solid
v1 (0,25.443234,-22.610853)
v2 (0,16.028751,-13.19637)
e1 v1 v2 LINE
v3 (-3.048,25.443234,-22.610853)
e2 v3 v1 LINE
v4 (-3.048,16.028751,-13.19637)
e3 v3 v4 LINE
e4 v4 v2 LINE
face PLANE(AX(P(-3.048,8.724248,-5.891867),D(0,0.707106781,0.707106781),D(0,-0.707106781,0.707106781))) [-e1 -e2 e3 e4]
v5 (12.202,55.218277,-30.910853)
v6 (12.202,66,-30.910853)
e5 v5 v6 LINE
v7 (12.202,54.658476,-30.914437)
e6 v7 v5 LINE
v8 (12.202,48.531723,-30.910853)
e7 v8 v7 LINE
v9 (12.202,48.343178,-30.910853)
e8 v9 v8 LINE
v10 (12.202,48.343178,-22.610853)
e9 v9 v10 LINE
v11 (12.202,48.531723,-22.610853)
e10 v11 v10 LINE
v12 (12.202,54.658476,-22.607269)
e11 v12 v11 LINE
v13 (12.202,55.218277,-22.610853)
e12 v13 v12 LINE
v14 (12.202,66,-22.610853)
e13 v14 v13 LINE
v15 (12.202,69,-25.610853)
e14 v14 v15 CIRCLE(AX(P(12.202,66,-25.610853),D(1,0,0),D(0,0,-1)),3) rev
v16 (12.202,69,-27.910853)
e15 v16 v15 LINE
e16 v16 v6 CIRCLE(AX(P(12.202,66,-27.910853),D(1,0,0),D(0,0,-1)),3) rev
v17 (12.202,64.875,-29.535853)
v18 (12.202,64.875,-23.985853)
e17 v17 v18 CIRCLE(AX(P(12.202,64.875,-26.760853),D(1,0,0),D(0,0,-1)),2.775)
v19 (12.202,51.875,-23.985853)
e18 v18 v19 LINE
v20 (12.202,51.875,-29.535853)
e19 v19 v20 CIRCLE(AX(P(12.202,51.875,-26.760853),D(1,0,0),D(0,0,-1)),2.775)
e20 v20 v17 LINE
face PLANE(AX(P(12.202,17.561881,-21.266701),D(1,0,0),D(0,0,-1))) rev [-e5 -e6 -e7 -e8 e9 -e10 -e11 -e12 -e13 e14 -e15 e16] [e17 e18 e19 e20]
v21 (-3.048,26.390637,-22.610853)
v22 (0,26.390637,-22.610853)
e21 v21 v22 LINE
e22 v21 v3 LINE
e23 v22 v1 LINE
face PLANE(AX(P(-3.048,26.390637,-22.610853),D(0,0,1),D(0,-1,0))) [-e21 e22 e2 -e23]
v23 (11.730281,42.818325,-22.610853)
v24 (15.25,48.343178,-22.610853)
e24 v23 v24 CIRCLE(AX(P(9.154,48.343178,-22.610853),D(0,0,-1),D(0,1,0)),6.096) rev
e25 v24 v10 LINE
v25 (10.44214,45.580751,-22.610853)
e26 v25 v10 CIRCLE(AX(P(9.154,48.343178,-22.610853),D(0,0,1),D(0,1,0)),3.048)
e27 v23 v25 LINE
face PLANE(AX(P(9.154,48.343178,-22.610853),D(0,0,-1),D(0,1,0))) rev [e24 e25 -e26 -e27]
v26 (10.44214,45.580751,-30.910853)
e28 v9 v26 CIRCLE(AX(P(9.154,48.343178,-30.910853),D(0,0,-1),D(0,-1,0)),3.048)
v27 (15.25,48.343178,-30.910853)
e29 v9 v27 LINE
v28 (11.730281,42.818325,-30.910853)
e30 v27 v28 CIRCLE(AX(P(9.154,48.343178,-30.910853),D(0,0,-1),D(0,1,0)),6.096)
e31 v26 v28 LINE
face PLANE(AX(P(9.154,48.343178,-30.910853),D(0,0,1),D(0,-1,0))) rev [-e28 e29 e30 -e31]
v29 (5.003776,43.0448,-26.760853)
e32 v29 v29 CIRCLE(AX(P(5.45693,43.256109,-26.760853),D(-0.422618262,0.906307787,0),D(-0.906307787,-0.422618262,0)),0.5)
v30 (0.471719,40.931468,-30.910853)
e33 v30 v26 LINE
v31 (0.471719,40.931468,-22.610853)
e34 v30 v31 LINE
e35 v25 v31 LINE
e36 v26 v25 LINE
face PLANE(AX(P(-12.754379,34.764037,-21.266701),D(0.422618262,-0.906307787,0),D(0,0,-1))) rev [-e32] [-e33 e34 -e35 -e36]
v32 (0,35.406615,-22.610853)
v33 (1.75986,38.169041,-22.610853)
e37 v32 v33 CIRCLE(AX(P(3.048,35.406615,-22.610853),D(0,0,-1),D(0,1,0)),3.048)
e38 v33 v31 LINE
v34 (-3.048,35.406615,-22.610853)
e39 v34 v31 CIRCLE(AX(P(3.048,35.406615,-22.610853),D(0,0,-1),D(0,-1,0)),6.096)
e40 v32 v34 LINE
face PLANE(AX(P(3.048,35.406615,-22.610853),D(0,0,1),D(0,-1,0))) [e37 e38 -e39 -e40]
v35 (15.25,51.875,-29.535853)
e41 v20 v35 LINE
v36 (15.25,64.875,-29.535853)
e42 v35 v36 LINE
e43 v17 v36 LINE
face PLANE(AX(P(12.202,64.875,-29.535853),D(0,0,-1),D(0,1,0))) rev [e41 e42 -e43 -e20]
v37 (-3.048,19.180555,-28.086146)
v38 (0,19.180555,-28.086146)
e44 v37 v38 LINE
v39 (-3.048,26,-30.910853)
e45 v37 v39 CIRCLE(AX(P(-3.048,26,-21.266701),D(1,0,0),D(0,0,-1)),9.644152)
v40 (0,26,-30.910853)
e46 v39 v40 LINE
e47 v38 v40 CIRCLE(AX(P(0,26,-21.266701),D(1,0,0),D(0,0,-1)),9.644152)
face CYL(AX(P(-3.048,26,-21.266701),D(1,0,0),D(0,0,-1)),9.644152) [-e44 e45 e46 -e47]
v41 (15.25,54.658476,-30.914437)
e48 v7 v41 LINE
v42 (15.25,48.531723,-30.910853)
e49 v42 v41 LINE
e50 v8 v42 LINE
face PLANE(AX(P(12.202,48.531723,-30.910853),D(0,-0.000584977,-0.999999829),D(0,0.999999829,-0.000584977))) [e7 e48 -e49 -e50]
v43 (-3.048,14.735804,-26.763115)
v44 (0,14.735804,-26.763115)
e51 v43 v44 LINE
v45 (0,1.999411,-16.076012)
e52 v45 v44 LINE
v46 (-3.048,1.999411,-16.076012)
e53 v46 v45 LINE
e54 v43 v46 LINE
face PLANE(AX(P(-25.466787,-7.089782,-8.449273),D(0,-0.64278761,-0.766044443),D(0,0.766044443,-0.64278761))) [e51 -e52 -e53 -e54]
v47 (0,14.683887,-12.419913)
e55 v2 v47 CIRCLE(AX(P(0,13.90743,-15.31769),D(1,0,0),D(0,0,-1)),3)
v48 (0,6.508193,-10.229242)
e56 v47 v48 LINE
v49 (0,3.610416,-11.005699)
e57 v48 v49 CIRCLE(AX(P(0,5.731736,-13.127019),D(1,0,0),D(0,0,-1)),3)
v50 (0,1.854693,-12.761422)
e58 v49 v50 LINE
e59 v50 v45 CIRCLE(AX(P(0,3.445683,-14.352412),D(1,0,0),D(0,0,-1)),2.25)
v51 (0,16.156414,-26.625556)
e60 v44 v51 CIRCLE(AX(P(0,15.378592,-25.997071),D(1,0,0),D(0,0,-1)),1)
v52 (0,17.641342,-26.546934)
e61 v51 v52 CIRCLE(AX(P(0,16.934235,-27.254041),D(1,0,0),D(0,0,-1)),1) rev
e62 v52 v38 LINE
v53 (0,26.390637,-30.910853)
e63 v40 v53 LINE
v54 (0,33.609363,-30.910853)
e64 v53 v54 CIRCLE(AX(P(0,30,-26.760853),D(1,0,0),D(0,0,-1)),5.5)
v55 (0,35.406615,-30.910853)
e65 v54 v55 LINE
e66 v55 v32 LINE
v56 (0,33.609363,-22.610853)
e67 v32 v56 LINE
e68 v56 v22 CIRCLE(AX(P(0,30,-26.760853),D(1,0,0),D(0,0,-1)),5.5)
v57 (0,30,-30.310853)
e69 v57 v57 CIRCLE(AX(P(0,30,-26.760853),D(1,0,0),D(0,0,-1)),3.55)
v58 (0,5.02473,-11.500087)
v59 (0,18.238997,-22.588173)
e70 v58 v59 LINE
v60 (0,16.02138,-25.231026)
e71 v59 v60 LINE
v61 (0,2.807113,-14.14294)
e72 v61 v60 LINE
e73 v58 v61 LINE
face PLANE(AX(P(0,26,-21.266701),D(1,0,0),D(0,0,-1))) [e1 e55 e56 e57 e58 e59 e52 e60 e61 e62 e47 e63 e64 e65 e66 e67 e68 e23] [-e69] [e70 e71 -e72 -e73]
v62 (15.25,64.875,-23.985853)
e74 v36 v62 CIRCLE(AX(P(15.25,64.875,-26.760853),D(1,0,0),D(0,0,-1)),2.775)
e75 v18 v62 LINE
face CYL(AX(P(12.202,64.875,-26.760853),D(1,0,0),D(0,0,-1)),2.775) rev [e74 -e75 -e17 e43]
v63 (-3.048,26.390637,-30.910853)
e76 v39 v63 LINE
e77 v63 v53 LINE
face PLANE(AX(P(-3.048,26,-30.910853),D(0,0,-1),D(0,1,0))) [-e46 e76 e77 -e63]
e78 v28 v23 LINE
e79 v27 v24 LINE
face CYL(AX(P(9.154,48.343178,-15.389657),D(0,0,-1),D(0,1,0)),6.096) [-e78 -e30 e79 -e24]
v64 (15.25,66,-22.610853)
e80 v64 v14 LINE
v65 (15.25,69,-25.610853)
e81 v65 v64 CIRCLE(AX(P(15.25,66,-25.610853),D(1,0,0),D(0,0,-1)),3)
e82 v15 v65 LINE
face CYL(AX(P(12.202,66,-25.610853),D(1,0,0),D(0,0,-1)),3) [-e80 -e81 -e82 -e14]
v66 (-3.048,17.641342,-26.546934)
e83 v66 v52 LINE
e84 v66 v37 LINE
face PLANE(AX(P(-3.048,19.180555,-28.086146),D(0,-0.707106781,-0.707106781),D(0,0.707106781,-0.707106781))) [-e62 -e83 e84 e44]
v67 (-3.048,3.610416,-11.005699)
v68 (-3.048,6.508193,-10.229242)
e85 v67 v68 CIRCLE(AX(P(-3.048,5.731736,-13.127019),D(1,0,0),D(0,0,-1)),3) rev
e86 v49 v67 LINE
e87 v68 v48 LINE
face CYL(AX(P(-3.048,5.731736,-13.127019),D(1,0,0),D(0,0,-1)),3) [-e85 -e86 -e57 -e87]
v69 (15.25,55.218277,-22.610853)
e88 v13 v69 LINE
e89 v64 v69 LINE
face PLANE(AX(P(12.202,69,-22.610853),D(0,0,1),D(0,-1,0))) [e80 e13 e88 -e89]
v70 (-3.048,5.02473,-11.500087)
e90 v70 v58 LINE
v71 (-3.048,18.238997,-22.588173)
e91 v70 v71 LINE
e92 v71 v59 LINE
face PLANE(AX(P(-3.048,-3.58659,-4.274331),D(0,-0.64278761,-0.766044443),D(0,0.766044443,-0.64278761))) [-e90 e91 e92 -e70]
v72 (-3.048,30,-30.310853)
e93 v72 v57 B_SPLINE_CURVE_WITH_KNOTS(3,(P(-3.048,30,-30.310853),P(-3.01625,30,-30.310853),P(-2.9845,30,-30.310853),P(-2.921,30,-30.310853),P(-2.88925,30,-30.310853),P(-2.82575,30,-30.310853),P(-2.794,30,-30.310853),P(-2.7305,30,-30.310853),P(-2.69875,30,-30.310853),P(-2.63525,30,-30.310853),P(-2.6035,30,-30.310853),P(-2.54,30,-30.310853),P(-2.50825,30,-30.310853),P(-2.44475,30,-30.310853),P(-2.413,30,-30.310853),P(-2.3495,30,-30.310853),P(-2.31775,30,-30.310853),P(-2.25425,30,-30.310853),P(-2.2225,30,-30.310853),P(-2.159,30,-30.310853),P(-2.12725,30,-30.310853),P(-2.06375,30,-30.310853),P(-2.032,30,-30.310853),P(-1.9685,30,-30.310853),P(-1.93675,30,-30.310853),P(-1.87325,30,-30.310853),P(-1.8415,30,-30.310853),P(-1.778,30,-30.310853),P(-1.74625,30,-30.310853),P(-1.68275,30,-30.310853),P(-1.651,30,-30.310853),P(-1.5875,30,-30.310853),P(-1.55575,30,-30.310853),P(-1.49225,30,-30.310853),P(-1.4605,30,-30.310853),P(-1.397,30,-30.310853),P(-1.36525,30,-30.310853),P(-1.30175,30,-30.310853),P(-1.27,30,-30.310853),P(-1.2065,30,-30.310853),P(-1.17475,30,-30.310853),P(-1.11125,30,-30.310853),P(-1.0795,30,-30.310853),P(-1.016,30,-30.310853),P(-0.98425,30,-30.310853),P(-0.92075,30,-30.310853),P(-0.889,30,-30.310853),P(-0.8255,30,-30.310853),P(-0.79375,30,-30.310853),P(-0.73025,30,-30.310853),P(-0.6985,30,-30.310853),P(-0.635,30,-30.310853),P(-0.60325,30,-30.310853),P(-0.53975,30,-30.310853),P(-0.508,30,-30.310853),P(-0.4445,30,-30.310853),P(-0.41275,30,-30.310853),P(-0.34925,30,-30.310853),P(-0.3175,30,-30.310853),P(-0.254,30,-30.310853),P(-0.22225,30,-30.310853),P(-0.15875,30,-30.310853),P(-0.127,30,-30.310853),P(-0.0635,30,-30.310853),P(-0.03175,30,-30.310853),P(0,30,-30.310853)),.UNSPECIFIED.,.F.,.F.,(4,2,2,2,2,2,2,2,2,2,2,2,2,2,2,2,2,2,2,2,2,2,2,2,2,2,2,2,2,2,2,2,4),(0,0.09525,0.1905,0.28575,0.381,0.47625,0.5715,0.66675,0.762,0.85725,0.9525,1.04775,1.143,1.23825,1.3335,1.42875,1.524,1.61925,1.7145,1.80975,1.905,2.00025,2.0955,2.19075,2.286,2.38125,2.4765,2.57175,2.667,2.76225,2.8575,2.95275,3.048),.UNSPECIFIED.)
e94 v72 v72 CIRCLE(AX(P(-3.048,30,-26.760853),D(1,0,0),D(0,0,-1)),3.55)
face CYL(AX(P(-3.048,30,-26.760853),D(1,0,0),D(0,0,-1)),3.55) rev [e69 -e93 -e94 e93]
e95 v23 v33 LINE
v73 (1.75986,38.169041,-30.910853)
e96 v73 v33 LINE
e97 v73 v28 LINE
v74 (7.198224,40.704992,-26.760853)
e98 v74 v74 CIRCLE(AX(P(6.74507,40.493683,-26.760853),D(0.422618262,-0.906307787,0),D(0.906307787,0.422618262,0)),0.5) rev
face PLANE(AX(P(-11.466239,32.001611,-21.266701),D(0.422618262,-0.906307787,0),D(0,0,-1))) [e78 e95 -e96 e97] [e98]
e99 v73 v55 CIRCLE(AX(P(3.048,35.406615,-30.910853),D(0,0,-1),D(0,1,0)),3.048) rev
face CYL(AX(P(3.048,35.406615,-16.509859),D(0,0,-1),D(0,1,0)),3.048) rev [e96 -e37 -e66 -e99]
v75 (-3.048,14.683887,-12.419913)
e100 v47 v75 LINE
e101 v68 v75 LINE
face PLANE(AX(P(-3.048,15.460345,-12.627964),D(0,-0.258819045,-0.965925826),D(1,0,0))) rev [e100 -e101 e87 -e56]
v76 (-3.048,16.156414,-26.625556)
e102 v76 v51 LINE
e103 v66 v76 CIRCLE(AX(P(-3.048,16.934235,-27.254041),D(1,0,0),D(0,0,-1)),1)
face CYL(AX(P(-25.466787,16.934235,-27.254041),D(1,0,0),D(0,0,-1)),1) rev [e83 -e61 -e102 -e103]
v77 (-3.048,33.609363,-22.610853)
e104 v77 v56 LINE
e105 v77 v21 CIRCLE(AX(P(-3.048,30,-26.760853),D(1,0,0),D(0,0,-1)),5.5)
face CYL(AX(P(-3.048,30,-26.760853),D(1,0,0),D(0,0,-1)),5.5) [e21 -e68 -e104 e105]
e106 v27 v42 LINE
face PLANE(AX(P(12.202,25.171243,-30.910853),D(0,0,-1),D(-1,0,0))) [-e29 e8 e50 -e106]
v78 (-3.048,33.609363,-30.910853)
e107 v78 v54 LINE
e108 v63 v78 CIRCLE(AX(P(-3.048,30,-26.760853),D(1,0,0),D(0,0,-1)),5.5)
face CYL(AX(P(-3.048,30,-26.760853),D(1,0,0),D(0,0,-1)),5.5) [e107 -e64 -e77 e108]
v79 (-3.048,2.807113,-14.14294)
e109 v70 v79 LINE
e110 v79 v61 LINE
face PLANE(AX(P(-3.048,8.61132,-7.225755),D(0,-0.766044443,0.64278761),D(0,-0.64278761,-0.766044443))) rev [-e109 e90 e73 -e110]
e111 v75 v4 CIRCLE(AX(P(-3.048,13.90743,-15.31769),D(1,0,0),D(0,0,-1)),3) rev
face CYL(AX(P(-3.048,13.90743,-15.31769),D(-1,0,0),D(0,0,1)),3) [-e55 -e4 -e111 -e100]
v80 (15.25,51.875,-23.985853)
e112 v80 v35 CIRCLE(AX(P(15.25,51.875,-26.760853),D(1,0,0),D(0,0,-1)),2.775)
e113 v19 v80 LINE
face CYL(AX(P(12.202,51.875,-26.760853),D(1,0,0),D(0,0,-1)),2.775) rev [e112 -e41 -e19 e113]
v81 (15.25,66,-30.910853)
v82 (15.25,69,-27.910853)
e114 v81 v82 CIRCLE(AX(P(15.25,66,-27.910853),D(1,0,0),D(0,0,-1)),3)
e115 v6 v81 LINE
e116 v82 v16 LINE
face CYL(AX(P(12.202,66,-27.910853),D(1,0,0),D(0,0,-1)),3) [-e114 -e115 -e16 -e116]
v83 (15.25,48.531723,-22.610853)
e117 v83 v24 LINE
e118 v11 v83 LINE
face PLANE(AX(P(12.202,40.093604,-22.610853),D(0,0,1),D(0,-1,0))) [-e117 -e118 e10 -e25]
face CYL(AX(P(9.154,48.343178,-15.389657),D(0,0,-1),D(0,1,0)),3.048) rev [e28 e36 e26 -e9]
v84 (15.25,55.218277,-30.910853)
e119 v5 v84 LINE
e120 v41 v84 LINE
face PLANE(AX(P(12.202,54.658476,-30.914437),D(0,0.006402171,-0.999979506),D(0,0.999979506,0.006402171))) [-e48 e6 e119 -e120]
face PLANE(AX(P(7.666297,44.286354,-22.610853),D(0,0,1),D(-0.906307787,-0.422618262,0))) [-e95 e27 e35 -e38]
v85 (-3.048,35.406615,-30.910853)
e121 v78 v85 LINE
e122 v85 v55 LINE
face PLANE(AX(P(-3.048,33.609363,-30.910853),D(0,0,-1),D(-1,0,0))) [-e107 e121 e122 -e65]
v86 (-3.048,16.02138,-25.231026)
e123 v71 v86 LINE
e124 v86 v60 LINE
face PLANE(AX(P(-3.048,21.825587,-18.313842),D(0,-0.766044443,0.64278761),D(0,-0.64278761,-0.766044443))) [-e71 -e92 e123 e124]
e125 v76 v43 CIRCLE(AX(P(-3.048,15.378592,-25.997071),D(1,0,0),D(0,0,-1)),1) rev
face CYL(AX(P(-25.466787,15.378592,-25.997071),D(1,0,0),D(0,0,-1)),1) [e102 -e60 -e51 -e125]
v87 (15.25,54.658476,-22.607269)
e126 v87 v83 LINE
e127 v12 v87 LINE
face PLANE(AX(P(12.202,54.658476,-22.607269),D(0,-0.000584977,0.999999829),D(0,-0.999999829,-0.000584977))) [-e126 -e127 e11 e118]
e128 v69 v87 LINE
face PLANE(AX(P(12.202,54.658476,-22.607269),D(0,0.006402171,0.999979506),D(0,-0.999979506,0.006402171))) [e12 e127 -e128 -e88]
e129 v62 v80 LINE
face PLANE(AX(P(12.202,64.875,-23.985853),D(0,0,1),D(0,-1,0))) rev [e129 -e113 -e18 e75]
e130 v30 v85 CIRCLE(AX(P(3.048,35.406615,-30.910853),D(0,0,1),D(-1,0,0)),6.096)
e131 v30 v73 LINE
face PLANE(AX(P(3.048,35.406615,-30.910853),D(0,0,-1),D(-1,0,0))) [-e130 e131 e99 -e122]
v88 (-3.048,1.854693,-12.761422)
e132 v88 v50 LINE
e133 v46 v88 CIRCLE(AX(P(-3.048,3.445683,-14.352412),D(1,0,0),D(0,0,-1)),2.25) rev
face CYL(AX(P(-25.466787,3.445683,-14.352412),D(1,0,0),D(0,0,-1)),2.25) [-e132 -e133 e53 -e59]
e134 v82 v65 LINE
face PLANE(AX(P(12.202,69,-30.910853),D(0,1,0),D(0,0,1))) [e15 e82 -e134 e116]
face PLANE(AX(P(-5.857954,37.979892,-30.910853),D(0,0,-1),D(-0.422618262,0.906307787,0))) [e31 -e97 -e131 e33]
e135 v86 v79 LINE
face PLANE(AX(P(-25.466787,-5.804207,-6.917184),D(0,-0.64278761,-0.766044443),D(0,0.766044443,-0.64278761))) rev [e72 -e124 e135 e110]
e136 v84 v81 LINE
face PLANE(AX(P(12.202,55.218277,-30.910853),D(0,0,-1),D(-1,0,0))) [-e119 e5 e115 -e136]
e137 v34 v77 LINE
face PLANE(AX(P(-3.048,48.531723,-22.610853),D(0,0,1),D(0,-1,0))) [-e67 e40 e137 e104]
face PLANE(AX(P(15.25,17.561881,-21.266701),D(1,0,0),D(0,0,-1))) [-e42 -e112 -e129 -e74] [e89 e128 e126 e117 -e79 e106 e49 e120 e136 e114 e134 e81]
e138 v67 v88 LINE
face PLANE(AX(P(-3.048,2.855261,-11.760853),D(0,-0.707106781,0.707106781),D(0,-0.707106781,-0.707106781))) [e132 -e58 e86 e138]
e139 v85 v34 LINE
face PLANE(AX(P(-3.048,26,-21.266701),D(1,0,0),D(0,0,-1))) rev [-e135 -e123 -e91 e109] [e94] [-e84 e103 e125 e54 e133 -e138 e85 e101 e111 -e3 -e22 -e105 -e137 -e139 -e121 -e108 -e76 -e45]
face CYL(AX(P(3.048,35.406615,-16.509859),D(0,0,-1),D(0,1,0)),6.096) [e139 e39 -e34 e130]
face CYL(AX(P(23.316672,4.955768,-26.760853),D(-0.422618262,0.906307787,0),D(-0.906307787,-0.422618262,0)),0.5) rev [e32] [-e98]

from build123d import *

# Parameters (mm, degrees)
BASE_FLANGE1_START     = -3.048
BASE_FLANGE1_OUTLINE_R = 3.55
BASE_FLANGE1_DEPTH     = 3.048
CHAMFER1_SIZE          = 5.5
CHAMFER1_SIZE2         = 9.526279442
FILLET5_R              = 3
JOG1_START             = -32.26085306
JOG1_DEPTH             = 22.133833772
JOG1_START_2           = -30.91085306
JOG1_2_DEPTH           = 1.375
JOG1_START_3           = -23.98585306
JOG1_3_DEPTH           = 1.375
JOG1_START_4           = -30.914437073
JOG1_4_DEPTH           = 8.307168025
JOG1_5_DEPTH           = 15.25
FILLET4_R              = 3
CUT_EXTRUDE3_DEPTH     = 78.680918765
BOSS_EXTRUDE1_DEPTH    = 3.048
CUT_EXTRUDE4_REACH     = 59.066
SKETCH15_R             = 0.5


with BuildPart() as part:
    # Base-Flange1: read off the stored shape, not the designer's step
    # Base-Flange1 outline → Base-Flange1 (new body)
    with BuildSketch(Plane(origin=(0, 0, 0), x_dir=(0, 0, -1), z_dir=(1, 0, 0)).offset(BASE_FLANGE1_START)):
        with BuildLine():
            Line((11.76085306, 2.855261469), (28.086146356, 19.180554765))
            ThreePointArc((28.086146356, 19.180554765), (30.176735706, 22.309342834), (30.91085306, 26))
            Line((30.91085306, 26), (30.91085306, 26.390637175))
            ThreePointArc((30.91085306, 26.390637175), (32.26085306, 30), (30.91085306, 33.609362825))
            Line((30.91085306, 33.609362825), (30.91085306, 48.531723164))
            Line((30.91085306, 48.531723164), (30.914437073, 54.658476217))
            Line((30.914437073, 54.658476217), (30.91085306, 55.218276836))
            Line((30.91085306, 55.218276836), (30.91085306, 69))
            Line((30.91085306, 69), (22.61085306, 69))
            Line((22.61085306, 69), (22.61085306, 55.218276836))
            Line((22.61085306, 55.218276836), (22.607269048, 54.658476217))
            Line((22.607269048, 54.658476217), (22.61085306, 48.531723164))
            Line((22.61085306, 48.531723164), (22.61085306, 33.609362825))
            ThreePointArc((22.61085306, 33.609362825), (21.26085306, 30), (22.61085306, 26.390637175))
            Line((22.61085306, 26.390637175), (22.61085306, 25.443234037))
            Line((22.61085306, 25.443234037), (5.891866776, 8.724247753))
            Line((5.891866776, 8.724247753), (11.76085306, 2.855261469))
        make_face()
        with Locations((26.76085306, 30)):
            Circle(BASE_FLANGE1_OUTLINE_R, mode=Mode.SUBTRACT)
        with BuildLine():
            ThreePointArc((23.98585306, 64.875), (26.76085306, 67.65), (29.53585306, 64.875))
            Line((29.53585306, 64.875), (29.53585306, 51.875))
            ThreePointArc((29.53585306, 51.875), (26.76085306, 49.1), (23.98585306, 51.875))
            Line((23.98585306, 51.875), (23.98585306, 64.875))
        make_face(mode=Mode.SUBTRACT)
    extrude(amount=BASE_FLANGE1_DEPTH)

    # Chamfer1
    chamfer1_edges = [part.edges().sort_by_distance(p)[0] for p in [
        (-1.524, 8.724247753, -5.891866776),
    ]]
    chamfer1_side = [part.faces().sort_by_distance(p)[0] for p in [
        (-1.524, 5.789754611, -8.826359918),
    ]]
    chamfer(chamfer1_edges, length=CHAMFER1_SIZE, length2=CHAMFER1_SIZE2, reference=chamfer1_side[0])

    # Fillet5
    fillet5_edges = [part.edges().sort_by_distance(p)[0] for p in [
        (-1.524, 15.460344546, -12.627963569),
        (-1.524, 4.835160456, -9.780954073),
    ]]
    fillet(fillet5_edges, radius=FILLET5_R)

    # Jog1: read off the stored shape, not the designer's step
    # Jog1 outline → Jog1 (cut)
    with BuildSketch(Plane.XY.offset(JOG1_START)):
        with BuildLine():
            ThreePointArc((-3.048, 35.406615264), (-2.231290862, 38.454615264), (0, 40.685906126))
            Line((0, 40.685906126), (0, 69))
            Line((0, 69), (-3.048, 69))
            Line((-3.048, 69), (-3.048, 35.406615264))
        make_face()
    extrude(amount=JOG1_DEPTH, mode=Mode.SUBTRACT)

    # Jog1 2 outline → Jog1 2 (add)
    with BuildSketch(Plane.XY.offset(JOG1_START_2)):
        with BuildLine():
            ThreePointArc((0, 35.406615264), (0.477342873, 37.04430447), (1.759859538, 38.169041399))
            Line((1.759859538, 38.169041399), (11.730280924, 42.818325246))
            ThreePointArc((11.730280924, 42.818325246), (14.295314254, 45.067799104), (15.25, 48.343177516))
            Line((15.25, 48.343177516), (15.25, 69))
            Line((15.25, 69), (12.202, 69))
            Line((12.202, 69), (12.202, 48.343177516))
            ThreePointArc((12.202, 48.343177516), (11.724657127, 46.70548831), (10.442140462, 45.580751381))
            Line((10.442140462, 45.580751381), (0.471719076, 40.931467534))
            ThreePointArc((0.471719076, 40.931467534), (0.233180454, 40.813833303), (0, 40.685906126))
            Line((0, 40.685906126), (0, 35.406615264))
        make_face()
    extrude(amount=JOG1_2_DEPTH)

    # Jog1 3 outline → Jog1 3 (add)
    with BuildSketch(Plane.XY.offset(JOG1_START_3)):
        with BuildLine():
            ThreePointArc((0, 35.406615264), (0.477342873, 37.04430447), (1.759859538, 38.169041399))
            Line((1.759859538, 38.169041399), (11.730280924, 42.818325246))
            ThreePointArc((11.730280924, 42.818325246), (14.295314254, 45.067799104), (15.25, 48.343177516))
            Line((15.25, 48.343177516), (15.25, 69))
            Line((15.25, 69), (12.202, 69))
            Line((12.202, 69), (12.202, 48.343177516))
            ThreePointArc((12.202, 48.343177516), (11.724657127, 46.70548831), (10.442140462, 45.580751381))
            Line((10.442140462, 45.580751381), (0.471719076, 40.931467534))
            ThreePointArc((0.471719076, 40.931467534), (0.233180454, 40.813833303), (0, 40.685906126))
            Line((0, 40.685906126), (0, 35.406615264))
        make_face()
    extrude(amount=JOG1_3_DEPTH)

    # Jog1 4 outline → Jog1 4 (add)
    with BuildSketch(Plane.XY.offset(JOG1_START_4)):
        with BuildLine():
            ThreePointArc((0, 35.406615264), (0.477342873, 37.04430447), (1.759859538, 38.169041399))
            Line((1.759859538, 38.169041399), (11.730280924, 42.818325246))
            ThreePointArc((11.730280924, 42.818325246), (14.295314254, 45.067799104), (15.25, 48.343177516))
            Line((15.25, 48.343177516), (15.25, 69))
            Line((15.25, 69), (12.202, 69))
            Line((12.202, 69), (12.202, 48.343177516))
            ThreePointArc((12.202, 48.343177516), (11.724657127, 46.70548831), (10.442140462, 45.580751381))
            Line((10.442140462, 45.580751381), (0.471719076, 40.931467534))
            ThreePointArc((0.471719076, 40.931467534), (0.233180454, 40.813833303), (0, 40.685906126))
            Line((0, 40.685906126), (0, 35.406615264))
        make_face()
    extrude(amount=JOG1_4_DEPTH)

    # Jog1 5 outline → Jog1 5 (cut)
    with BuildSketch(Plane.YZ):
        Polygon((48.531723164, -30.91085306), (34, -30.91085306), (34, -30.914437073), (54.658476217, -30.914437073), align=None)
        Polygon((34, -22.607269048), (34, -22.61085306), (48.531723164, -22.61085306), (54.658476217, -22.607269048), align=None)
        Polygon((55.218276836, -30.91085306), (54.658476217, -30.914437073), (70, -30.914437073), (70, -30.91085306), align=None)
        Polygon((70, -22.607269048), (54.658476217, -22.607269048), (55.218276836, -22.61085306), (70, -22.61085306), align=None)
        with BuildLine():
            Line((64.875, -23.98585306), (51.875, -23.98585306))
            ThreePointArc((51.875, -23.98585306), (49.1, -26.76085306), (51.875, -29.53585306))
            Line((51.875, -29.53585306), (64.875, -29.53585306))
            ThreePointArc((64.875, -29.53585306), (67.65, -26.76085306), (64.875, -23.98585306))
        make_face()
    extrude(amount=JOG1_5_DEPTH, mode=Mode.SUBTRACT)

    # Fillet4
    fillet4_edges = [part.edges().sort_by_distance(p)[0] for p in [
        (13.726, 69, -30.91085306),
        (13.726, 69, -22.61085306),
    ]]
    fillet(fillet4_edges, radius=FILLET4_R)

    # Sketch14<4> → Cut-Extrude3 (cut, through all)
    with BuildSketch(Plane(origin=(0, 0, 0), x_dir=(0, 0, -1), z_dir=(1, 0, 0))):
        Polygon((11.500086567, 5.024730268), (12.821513232, 3.915921641), (25.065698027, 16.160106436), (22.588172835, 18.238996911), align=None)
        Polygon((25.065698027, 16.160106436), (12.821513232, 3.915921641), (14.142939896, 2.807113014), (25.231026163, 16.021379658), align=None)
    extrude(amount=-CUT_EXTRUDE3_DEPTH, mode=Mode.SUBTRACT)

    # Sketch14 → Boss-Extrude1 (add)
    with BuildSketch(Plane(origin=(0, 0, 0), x_dir=(0, 0, -1), z_dir=(1, 0, 0))):
        with BuildLine():
            Line((12.821513232, 3.915921641), (11.76085306, 2.855261469))
            Line((11.76085306, 2.855261469), (12.761421716, 1.854692814))
            ThreePointArc((12.761421716, 1.854692814), (14.450555595, 1.197824573), (16.07601197, 1.999410949))
            Line((16.07601197, 1.999410949), (26.76311505, 14.735804439))
            ThreePointArc((26.76311505, 14.735804439), (26.992415169, 15.474972553), (26.625555608, 16.156413752))
            ThreePointArc((26.625555608, 16.156413752), (26.255439336, 16.881363004), (26.546933828, 17.641342237))
            Line((26.546933828, 17.641342237), (25.065698027, 16.160106436))
            Line((25.065698027, 16.160106436), (25.231026163, 16.021379658))
            Line((25.231026163, 16.021379658), (14.142939896, 2.807113014))
            Line((14.142939896, 2.807113014), (12.821513232, 3.915921641))
        make_face()
    extrude(amount=-BOSS_EXTRUDE1_DEPTH)

    # Sketch15 → Cut-Extrude4 (cut, up to next)
    with BuildSketch(Plane(origin=(-15.593409677, 33.440174967, 0), x_dir=(0.906307787036651, 0.4226182617406973, 0), z_dir=(-0.4226182617406973, 0.906307787036651, 0)), mode=Mode.PRIVATE) as cut_extrude4_sk1:
        with Locations(Location((23.226479732, 26.76085306, 0), (0, 0, 180))):
            Circle(SKETCH15_R)
    cut_extrude4_tool1 = extrude(cut_extrude4_sk1.sketch, amount=-CUT_EXTRUDE4_REACH, mode=Mode.PRIVATE) & part.part
    add(cut_extrude4_tool1.solids().sort_by_distance((5.45693, 43.256109, -26.760853))[0], mode=Mode.SUBTRACT)


solid = part.part
